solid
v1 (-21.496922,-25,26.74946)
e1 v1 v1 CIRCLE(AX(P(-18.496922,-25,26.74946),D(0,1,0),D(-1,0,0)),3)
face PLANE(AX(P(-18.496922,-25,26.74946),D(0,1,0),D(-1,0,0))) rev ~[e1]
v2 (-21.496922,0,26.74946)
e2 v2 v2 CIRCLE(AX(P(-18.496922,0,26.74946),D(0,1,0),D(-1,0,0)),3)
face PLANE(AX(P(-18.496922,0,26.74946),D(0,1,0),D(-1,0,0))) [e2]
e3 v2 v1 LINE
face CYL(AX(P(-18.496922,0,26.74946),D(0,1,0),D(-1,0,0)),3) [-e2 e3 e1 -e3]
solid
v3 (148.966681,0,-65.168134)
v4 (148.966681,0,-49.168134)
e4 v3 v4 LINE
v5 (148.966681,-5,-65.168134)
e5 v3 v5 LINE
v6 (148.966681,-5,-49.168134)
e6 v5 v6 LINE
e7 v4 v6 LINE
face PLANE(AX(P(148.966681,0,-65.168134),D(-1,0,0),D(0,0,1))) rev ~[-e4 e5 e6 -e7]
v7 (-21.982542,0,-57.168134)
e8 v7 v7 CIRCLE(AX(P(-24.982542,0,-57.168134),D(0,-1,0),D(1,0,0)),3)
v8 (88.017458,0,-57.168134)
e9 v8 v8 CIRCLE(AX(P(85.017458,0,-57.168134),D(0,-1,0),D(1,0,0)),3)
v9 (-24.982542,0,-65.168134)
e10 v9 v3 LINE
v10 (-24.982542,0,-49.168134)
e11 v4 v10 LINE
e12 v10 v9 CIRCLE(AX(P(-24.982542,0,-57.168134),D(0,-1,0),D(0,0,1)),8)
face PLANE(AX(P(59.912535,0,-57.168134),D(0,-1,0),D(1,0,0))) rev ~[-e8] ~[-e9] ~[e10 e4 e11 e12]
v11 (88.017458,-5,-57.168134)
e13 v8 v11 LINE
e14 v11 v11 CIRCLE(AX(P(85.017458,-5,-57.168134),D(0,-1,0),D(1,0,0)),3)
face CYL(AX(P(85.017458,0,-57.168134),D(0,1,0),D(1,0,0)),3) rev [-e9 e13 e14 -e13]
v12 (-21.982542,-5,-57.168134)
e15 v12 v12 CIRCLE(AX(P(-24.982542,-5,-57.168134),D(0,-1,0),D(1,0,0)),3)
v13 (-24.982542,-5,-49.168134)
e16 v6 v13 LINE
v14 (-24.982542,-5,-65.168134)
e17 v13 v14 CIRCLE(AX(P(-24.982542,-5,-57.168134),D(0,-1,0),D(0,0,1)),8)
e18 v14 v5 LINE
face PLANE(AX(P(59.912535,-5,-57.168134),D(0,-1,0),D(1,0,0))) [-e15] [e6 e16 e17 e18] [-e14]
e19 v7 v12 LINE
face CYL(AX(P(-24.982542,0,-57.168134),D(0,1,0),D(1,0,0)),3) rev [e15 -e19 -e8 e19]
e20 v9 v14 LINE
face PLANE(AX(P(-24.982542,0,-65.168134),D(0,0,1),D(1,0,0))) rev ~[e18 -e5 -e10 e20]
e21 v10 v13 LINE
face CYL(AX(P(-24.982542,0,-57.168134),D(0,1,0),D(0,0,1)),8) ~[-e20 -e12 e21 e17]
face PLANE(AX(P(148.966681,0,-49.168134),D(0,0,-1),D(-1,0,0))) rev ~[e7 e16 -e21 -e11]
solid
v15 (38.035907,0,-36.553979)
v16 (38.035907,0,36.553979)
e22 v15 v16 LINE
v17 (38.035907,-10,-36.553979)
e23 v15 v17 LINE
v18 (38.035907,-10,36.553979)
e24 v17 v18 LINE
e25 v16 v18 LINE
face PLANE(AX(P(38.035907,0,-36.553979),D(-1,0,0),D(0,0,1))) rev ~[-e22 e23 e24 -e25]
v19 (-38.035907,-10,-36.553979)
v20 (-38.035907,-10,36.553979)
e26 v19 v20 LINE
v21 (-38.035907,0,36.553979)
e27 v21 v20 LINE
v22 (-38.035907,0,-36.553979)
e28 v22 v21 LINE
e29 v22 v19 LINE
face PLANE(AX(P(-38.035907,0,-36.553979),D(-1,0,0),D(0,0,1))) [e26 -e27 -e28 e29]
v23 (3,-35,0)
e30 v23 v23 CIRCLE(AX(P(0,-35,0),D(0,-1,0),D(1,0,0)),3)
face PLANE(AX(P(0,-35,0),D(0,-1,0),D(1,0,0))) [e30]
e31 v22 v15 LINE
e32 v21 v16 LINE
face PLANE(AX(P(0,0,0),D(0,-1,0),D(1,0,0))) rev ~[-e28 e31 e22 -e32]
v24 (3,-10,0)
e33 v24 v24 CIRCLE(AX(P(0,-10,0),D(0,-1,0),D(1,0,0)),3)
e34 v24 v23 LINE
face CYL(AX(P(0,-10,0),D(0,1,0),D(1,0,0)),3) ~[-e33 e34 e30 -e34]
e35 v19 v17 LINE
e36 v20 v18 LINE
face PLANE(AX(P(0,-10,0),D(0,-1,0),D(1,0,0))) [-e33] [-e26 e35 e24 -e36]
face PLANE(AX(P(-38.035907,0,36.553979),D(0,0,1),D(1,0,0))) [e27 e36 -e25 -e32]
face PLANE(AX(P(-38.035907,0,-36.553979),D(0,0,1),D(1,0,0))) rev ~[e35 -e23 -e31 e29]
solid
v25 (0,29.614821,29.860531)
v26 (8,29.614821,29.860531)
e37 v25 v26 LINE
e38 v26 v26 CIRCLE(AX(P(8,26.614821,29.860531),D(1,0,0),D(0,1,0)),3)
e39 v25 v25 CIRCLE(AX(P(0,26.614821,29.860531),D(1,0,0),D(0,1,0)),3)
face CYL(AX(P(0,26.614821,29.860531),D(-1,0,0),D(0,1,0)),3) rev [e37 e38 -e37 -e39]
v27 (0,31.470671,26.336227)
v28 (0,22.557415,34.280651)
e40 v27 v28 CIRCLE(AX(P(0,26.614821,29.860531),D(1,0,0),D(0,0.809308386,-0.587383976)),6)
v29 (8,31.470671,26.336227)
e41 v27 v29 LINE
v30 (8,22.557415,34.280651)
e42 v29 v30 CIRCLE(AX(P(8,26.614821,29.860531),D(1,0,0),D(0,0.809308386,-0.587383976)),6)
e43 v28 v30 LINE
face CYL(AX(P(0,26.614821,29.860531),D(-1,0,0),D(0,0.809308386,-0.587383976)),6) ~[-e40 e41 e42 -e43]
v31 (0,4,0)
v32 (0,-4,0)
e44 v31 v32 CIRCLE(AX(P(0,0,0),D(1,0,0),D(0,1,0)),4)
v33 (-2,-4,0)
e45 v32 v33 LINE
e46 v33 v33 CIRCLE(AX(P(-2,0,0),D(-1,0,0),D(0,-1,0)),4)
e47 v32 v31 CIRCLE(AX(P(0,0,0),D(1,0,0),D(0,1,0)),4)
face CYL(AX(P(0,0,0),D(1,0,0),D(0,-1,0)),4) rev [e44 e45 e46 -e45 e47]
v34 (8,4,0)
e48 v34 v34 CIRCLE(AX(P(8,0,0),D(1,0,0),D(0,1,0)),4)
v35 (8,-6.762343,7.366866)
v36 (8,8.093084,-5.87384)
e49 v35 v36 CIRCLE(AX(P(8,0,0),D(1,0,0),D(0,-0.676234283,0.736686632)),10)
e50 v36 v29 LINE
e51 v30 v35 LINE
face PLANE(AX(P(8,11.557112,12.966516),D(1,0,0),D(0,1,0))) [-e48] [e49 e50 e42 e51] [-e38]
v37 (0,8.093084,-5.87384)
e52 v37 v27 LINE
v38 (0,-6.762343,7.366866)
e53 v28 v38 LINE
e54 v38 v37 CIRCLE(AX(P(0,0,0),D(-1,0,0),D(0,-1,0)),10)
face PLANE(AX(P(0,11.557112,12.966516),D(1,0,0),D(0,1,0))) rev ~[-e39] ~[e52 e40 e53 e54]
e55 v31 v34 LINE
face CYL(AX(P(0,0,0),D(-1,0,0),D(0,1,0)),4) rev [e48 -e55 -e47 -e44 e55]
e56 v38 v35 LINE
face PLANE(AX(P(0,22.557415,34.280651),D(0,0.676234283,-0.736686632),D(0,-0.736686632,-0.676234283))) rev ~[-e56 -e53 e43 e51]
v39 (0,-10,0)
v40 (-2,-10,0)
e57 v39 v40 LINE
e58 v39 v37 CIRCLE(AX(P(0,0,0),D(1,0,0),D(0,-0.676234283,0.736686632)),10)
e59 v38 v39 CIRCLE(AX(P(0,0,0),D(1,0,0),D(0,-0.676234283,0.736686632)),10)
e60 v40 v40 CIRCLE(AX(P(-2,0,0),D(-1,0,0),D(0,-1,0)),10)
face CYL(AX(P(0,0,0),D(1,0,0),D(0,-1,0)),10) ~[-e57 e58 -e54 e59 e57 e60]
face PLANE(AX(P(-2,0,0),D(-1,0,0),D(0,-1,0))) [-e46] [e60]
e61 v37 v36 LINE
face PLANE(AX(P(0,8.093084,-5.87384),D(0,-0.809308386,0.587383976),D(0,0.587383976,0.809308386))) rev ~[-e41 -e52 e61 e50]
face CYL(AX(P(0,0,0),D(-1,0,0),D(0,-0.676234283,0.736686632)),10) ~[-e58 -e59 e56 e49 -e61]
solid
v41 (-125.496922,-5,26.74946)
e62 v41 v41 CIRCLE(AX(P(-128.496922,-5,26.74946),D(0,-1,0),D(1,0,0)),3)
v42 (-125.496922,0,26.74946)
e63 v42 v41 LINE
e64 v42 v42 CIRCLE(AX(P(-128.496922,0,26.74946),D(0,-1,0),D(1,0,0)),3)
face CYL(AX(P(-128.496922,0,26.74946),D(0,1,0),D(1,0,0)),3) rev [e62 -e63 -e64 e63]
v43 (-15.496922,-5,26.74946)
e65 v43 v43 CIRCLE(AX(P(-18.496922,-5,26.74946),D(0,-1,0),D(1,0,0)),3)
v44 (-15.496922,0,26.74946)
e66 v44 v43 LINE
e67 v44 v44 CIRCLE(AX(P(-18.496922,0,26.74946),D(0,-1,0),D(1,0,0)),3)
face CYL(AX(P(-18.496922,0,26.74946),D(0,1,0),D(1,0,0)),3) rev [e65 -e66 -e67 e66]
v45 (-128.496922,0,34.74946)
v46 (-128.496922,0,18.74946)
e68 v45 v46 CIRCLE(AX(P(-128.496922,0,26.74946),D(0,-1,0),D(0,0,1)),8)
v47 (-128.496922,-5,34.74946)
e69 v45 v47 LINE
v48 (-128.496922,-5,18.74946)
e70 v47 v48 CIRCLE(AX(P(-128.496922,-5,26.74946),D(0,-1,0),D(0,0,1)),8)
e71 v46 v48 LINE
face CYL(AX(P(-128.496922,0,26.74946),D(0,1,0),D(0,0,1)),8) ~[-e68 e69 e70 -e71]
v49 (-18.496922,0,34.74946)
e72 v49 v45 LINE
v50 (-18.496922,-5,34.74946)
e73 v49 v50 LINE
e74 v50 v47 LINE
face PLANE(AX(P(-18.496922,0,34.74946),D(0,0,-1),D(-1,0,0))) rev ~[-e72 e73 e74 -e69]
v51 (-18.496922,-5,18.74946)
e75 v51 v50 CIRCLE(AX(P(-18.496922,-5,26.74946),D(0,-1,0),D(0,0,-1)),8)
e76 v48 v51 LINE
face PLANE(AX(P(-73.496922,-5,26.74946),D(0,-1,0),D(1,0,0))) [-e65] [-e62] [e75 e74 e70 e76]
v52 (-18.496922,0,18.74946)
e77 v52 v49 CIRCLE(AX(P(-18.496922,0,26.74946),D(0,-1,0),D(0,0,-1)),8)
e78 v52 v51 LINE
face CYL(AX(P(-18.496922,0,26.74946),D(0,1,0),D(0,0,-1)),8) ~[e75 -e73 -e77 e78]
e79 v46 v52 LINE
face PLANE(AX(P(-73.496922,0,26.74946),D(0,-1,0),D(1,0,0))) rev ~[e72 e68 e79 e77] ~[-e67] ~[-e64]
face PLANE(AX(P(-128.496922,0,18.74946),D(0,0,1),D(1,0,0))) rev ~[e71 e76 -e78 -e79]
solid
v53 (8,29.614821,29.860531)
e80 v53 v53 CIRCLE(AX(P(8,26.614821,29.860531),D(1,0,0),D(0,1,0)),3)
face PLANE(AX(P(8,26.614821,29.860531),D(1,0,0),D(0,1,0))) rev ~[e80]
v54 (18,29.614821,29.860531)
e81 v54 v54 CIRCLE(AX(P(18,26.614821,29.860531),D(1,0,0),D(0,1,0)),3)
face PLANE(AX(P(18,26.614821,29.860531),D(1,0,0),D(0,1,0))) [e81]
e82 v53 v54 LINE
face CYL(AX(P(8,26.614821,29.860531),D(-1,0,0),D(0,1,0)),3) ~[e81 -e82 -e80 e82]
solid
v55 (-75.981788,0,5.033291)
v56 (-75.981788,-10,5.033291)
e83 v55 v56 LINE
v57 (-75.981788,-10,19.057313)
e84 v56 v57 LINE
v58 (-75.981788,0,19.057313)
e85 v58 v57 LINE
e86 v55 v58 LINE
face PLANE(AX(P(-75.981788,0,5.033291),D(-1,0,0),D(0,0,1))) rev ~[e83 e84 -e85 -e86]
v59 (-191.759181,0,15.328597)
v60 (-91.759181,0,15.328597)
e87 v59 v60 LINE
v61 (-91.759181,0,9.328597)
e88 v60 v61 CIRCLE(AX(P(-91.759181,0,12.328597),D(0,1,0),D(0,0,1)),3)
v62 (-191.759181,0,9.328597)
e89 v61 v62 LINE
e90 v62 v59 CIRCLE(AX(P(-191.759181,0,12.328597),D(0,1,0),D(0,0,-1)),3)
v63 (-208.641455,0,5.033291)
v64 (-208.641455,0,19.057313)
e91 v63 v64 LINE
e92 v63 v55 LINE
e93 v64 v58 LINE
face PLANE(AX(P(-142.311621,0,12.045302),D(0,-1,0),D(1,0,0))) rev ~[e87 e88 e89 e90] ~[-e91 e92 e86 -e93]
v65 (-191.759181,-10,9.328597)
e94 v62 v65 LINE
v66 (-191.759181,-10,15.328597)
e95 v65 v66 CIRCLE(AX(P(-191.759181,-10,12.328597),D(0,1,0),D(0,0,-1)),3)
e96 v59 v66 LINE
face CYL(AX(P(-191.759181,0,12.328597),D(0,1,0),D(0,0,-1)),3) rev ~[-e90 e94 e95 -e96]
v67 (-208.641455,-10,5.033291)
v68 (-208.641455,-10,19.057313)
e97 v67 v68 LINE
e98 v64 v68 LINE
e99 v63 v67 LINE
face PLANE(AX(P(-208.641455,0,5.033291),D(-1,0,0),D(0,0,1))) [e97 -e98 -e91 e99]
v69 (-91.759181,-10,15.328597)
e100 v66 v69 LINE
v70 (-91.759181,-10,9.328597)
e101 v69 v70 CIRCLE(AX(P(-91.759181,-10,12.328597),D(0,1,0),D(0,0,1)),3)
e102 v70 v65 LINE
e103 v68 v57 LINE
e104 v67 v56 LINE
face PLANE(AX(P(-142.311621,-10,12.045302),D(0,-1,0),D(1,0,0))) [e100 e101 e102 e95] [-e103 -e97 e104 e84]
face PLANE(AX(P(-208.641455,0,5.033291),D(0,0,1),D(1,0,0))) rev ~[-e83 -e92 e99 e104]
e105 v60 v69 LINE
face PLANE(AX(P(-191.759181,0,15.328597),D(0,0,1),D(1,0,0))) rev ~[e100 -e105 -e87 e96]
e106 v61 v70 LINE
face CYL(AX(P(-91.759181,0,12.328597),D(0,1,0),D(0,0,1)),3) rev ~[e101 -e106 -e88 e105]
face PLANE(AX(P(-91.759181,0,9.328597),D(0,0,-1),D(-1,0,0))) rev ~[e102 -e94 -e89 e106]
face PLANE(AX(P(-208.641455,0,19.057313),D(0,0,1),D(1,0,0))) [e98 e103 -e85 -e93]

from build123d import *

# Parameters (mm, degrees)
F0_W      = 76.0718137026
F0_H      = 73.10795784
F1_DEPTH  = 10
F2_R      = 3
F3_DEPTH  = 25
F4_R      = 3
F5_DEPTH  = 5
F6_R      = 4
F6_R_2    = 3
F7_DEPTH  = 8
F8_R      = 10
F8_R_2    = 4
F9_DEPTH  = 2
F10_R     = 3
F11_DEPTH = 25
F12_W     = 132.6596662402
F12_H     = 14.0240215696
F13_DEPTH = 10
F14_R     = 3
F15_DEPTH = 10
F18_R     = 3
F19_DEPTH = 5


with BuildPart() as f1:
    # F0 (on Front) → F1 (new body)
    with BuildSketch(Plane.XZ):
        Rectangle(F0_W, F0_H)
    extrude(amount=F1_DEPTH)

    # F2 (on face) → F3 (join)
    with BuildSketch(Plane.XZ.offset(10)):
        Circle(F2_R)
    extrude(amount=F3_DEPTH)


with BuildPart() as f5:
    # F4 (on Front) → F5 (new body)
    with BuildSketch(Plane.XZ):
        with BuildLine():
            Line((-18.4969218779, 34.7494600266), (-128.4969218779, 34.7494600266))
            ThreePointArc((-128.4969218779, 34.7494600266), (-136.4969218779, 26.7494600266), (-128.4969218779, 18.7494600266))
            Line((-128.4969218779, 18.7494600266), (-18.4969218779, 18.7494600266))
            ThreePointArc((-18.4969218779, 18.7494600266), (-10.4969218779, 26.7494600266), (-18.4969218779, 34.7494600266))
        make_face()
        with Locations((-128.4969218779, 26.7494600266)):
            Circle(F4_R, mode=Mode.SUBTRACT)
        with Locations((-18.4969218779, 26.7494600266)):
            Circle(F4_R, mode=Mode.SUBTRACT)
    extrude(amount=F5_DEPTH)


with BuildPart() as f7:
    # F6 (on Right) → F7 (new body)
    with BuildSketch(Plane.YZ):
        with BuildLine():
            Line((22.5574149312, 34.2806509801), (-6.7623428333, 7.3668663219))
            ThreePointArc((-6.7623428333, 7.3668663219), (-6.6537051578, -7.4651327967), (8.0930838649, -5.8738397626))
            Line((8.0930838649, -5.8738397626), (31.4706709501, 26.3362273294))
            ThreePointArc((31.4706709501, 26.3362273294), (30.6070437259, 34.339610865), (22.5574149312, 34.2806509801))
        make_face()
        Circle(F6_R, mode=Mode.SUBTRACT)
        with Locations((26.6148206312, 29.860531187)):
            Circle(F6_R_2, mode=Mode.SUBTRACT)
    extrude(amount=F7_DEPTH)

    # F8 (on face) → F9 (join)
    with BuildSketch(Plane(origin=(0, 0, 0), x_dir=(0, -1, 0), z_dir=(-1, 0, 0))):
        Circle(F8_R)
        Circle(F8_R_2, mode=Mode.SUBTRACT)
    extrude(amount=F9_DEPTH)


with BuildPart() as f11:
    # F10 (on face) → F11 (new body)
    with BuildSketch(Plane(origin=(0, 0, 0), x_dir=(-1, 0, 0), z_dir=(0, 1, 0))):
        with Locations((18.4969218779, 26.7494600266)):
            Circle(F10_R)
    extrude(amount=-F11_DEPTH)


with BuildPart() as f13:
    # F12 (on Front) → F13 (new body)
    with BuildSketch(Plane.XZ):
        with Locations((-142.3116214573, 12.0453021955)):
            Rectangle(F12_W, F12_H)
        with BuildLine():
            ThreePointArc((-191.759181451, 9.3285967857), (-194.759181451, 12.3285967857), (-191.759181451, 15.3285967857))
            Line((-191.759181451, 15.3285967857), (-91.759181451, 15.3285967857))
            ThreePointArc((-91.759181451, 15.3285967857), (-88.759181451, 12.3285967857), (-91.759181451, 9.3285967857))
            Line((-91.759181451, 9.3285967857), (-191.759181451, 9.3285967857))
        make_face(mode=Mode.SUBTRACT)
    extrude(amount=F13_DEPTH)


with BuildPart() as f15:
    # F14 (on face) → F15 (new body)
    with BuildSketch(Plane.YZ.offset(8)):
        with Locations((26.6148206312, 29.860531187)):
            Circle(F14_R)
    extrude(amount=F15_DEPTH)


with BuildPart() as f16_1:
    # F16: copy of F5
    add(f5.part.moved(Location((0, -77, 0))))


with BuildPart() as f19:
    # F18 (on Front) → F19 (new body)
    with BuildSketch(Plane.XZ):
        with BuildLine():
            Line((148.9666812122, -49.1681344882), (-24.9825420976, -49.1681344882))
            ThreePointArc((-24.9825420976, -49.1681344882), (-32.9825420976, -57.1681344882), (-24.9825420976, -65.1681344882))
            Line((-24.9825420976, -65.1681344882), (148.9666812122, -65.1681344882))
            Line((148.9666812122, -65.1681344882), (148.9666812122, -49.1681344882))
        make_face()
        with Locations((-24.9825420976, -57.1681344882)):
            Circle(F18_R, mode=Mode.SUBTRACT)
        with Locations((85.0174579024, -57.1681344882)):
            Circle(F18_R, mode=Mode.SUBTRACT)
    extrude(amount=F19_DEPTH)


solid = Compound([f1.part, f5.part, f7.part, f11.part, f13.part, f15.part, f19.part])
